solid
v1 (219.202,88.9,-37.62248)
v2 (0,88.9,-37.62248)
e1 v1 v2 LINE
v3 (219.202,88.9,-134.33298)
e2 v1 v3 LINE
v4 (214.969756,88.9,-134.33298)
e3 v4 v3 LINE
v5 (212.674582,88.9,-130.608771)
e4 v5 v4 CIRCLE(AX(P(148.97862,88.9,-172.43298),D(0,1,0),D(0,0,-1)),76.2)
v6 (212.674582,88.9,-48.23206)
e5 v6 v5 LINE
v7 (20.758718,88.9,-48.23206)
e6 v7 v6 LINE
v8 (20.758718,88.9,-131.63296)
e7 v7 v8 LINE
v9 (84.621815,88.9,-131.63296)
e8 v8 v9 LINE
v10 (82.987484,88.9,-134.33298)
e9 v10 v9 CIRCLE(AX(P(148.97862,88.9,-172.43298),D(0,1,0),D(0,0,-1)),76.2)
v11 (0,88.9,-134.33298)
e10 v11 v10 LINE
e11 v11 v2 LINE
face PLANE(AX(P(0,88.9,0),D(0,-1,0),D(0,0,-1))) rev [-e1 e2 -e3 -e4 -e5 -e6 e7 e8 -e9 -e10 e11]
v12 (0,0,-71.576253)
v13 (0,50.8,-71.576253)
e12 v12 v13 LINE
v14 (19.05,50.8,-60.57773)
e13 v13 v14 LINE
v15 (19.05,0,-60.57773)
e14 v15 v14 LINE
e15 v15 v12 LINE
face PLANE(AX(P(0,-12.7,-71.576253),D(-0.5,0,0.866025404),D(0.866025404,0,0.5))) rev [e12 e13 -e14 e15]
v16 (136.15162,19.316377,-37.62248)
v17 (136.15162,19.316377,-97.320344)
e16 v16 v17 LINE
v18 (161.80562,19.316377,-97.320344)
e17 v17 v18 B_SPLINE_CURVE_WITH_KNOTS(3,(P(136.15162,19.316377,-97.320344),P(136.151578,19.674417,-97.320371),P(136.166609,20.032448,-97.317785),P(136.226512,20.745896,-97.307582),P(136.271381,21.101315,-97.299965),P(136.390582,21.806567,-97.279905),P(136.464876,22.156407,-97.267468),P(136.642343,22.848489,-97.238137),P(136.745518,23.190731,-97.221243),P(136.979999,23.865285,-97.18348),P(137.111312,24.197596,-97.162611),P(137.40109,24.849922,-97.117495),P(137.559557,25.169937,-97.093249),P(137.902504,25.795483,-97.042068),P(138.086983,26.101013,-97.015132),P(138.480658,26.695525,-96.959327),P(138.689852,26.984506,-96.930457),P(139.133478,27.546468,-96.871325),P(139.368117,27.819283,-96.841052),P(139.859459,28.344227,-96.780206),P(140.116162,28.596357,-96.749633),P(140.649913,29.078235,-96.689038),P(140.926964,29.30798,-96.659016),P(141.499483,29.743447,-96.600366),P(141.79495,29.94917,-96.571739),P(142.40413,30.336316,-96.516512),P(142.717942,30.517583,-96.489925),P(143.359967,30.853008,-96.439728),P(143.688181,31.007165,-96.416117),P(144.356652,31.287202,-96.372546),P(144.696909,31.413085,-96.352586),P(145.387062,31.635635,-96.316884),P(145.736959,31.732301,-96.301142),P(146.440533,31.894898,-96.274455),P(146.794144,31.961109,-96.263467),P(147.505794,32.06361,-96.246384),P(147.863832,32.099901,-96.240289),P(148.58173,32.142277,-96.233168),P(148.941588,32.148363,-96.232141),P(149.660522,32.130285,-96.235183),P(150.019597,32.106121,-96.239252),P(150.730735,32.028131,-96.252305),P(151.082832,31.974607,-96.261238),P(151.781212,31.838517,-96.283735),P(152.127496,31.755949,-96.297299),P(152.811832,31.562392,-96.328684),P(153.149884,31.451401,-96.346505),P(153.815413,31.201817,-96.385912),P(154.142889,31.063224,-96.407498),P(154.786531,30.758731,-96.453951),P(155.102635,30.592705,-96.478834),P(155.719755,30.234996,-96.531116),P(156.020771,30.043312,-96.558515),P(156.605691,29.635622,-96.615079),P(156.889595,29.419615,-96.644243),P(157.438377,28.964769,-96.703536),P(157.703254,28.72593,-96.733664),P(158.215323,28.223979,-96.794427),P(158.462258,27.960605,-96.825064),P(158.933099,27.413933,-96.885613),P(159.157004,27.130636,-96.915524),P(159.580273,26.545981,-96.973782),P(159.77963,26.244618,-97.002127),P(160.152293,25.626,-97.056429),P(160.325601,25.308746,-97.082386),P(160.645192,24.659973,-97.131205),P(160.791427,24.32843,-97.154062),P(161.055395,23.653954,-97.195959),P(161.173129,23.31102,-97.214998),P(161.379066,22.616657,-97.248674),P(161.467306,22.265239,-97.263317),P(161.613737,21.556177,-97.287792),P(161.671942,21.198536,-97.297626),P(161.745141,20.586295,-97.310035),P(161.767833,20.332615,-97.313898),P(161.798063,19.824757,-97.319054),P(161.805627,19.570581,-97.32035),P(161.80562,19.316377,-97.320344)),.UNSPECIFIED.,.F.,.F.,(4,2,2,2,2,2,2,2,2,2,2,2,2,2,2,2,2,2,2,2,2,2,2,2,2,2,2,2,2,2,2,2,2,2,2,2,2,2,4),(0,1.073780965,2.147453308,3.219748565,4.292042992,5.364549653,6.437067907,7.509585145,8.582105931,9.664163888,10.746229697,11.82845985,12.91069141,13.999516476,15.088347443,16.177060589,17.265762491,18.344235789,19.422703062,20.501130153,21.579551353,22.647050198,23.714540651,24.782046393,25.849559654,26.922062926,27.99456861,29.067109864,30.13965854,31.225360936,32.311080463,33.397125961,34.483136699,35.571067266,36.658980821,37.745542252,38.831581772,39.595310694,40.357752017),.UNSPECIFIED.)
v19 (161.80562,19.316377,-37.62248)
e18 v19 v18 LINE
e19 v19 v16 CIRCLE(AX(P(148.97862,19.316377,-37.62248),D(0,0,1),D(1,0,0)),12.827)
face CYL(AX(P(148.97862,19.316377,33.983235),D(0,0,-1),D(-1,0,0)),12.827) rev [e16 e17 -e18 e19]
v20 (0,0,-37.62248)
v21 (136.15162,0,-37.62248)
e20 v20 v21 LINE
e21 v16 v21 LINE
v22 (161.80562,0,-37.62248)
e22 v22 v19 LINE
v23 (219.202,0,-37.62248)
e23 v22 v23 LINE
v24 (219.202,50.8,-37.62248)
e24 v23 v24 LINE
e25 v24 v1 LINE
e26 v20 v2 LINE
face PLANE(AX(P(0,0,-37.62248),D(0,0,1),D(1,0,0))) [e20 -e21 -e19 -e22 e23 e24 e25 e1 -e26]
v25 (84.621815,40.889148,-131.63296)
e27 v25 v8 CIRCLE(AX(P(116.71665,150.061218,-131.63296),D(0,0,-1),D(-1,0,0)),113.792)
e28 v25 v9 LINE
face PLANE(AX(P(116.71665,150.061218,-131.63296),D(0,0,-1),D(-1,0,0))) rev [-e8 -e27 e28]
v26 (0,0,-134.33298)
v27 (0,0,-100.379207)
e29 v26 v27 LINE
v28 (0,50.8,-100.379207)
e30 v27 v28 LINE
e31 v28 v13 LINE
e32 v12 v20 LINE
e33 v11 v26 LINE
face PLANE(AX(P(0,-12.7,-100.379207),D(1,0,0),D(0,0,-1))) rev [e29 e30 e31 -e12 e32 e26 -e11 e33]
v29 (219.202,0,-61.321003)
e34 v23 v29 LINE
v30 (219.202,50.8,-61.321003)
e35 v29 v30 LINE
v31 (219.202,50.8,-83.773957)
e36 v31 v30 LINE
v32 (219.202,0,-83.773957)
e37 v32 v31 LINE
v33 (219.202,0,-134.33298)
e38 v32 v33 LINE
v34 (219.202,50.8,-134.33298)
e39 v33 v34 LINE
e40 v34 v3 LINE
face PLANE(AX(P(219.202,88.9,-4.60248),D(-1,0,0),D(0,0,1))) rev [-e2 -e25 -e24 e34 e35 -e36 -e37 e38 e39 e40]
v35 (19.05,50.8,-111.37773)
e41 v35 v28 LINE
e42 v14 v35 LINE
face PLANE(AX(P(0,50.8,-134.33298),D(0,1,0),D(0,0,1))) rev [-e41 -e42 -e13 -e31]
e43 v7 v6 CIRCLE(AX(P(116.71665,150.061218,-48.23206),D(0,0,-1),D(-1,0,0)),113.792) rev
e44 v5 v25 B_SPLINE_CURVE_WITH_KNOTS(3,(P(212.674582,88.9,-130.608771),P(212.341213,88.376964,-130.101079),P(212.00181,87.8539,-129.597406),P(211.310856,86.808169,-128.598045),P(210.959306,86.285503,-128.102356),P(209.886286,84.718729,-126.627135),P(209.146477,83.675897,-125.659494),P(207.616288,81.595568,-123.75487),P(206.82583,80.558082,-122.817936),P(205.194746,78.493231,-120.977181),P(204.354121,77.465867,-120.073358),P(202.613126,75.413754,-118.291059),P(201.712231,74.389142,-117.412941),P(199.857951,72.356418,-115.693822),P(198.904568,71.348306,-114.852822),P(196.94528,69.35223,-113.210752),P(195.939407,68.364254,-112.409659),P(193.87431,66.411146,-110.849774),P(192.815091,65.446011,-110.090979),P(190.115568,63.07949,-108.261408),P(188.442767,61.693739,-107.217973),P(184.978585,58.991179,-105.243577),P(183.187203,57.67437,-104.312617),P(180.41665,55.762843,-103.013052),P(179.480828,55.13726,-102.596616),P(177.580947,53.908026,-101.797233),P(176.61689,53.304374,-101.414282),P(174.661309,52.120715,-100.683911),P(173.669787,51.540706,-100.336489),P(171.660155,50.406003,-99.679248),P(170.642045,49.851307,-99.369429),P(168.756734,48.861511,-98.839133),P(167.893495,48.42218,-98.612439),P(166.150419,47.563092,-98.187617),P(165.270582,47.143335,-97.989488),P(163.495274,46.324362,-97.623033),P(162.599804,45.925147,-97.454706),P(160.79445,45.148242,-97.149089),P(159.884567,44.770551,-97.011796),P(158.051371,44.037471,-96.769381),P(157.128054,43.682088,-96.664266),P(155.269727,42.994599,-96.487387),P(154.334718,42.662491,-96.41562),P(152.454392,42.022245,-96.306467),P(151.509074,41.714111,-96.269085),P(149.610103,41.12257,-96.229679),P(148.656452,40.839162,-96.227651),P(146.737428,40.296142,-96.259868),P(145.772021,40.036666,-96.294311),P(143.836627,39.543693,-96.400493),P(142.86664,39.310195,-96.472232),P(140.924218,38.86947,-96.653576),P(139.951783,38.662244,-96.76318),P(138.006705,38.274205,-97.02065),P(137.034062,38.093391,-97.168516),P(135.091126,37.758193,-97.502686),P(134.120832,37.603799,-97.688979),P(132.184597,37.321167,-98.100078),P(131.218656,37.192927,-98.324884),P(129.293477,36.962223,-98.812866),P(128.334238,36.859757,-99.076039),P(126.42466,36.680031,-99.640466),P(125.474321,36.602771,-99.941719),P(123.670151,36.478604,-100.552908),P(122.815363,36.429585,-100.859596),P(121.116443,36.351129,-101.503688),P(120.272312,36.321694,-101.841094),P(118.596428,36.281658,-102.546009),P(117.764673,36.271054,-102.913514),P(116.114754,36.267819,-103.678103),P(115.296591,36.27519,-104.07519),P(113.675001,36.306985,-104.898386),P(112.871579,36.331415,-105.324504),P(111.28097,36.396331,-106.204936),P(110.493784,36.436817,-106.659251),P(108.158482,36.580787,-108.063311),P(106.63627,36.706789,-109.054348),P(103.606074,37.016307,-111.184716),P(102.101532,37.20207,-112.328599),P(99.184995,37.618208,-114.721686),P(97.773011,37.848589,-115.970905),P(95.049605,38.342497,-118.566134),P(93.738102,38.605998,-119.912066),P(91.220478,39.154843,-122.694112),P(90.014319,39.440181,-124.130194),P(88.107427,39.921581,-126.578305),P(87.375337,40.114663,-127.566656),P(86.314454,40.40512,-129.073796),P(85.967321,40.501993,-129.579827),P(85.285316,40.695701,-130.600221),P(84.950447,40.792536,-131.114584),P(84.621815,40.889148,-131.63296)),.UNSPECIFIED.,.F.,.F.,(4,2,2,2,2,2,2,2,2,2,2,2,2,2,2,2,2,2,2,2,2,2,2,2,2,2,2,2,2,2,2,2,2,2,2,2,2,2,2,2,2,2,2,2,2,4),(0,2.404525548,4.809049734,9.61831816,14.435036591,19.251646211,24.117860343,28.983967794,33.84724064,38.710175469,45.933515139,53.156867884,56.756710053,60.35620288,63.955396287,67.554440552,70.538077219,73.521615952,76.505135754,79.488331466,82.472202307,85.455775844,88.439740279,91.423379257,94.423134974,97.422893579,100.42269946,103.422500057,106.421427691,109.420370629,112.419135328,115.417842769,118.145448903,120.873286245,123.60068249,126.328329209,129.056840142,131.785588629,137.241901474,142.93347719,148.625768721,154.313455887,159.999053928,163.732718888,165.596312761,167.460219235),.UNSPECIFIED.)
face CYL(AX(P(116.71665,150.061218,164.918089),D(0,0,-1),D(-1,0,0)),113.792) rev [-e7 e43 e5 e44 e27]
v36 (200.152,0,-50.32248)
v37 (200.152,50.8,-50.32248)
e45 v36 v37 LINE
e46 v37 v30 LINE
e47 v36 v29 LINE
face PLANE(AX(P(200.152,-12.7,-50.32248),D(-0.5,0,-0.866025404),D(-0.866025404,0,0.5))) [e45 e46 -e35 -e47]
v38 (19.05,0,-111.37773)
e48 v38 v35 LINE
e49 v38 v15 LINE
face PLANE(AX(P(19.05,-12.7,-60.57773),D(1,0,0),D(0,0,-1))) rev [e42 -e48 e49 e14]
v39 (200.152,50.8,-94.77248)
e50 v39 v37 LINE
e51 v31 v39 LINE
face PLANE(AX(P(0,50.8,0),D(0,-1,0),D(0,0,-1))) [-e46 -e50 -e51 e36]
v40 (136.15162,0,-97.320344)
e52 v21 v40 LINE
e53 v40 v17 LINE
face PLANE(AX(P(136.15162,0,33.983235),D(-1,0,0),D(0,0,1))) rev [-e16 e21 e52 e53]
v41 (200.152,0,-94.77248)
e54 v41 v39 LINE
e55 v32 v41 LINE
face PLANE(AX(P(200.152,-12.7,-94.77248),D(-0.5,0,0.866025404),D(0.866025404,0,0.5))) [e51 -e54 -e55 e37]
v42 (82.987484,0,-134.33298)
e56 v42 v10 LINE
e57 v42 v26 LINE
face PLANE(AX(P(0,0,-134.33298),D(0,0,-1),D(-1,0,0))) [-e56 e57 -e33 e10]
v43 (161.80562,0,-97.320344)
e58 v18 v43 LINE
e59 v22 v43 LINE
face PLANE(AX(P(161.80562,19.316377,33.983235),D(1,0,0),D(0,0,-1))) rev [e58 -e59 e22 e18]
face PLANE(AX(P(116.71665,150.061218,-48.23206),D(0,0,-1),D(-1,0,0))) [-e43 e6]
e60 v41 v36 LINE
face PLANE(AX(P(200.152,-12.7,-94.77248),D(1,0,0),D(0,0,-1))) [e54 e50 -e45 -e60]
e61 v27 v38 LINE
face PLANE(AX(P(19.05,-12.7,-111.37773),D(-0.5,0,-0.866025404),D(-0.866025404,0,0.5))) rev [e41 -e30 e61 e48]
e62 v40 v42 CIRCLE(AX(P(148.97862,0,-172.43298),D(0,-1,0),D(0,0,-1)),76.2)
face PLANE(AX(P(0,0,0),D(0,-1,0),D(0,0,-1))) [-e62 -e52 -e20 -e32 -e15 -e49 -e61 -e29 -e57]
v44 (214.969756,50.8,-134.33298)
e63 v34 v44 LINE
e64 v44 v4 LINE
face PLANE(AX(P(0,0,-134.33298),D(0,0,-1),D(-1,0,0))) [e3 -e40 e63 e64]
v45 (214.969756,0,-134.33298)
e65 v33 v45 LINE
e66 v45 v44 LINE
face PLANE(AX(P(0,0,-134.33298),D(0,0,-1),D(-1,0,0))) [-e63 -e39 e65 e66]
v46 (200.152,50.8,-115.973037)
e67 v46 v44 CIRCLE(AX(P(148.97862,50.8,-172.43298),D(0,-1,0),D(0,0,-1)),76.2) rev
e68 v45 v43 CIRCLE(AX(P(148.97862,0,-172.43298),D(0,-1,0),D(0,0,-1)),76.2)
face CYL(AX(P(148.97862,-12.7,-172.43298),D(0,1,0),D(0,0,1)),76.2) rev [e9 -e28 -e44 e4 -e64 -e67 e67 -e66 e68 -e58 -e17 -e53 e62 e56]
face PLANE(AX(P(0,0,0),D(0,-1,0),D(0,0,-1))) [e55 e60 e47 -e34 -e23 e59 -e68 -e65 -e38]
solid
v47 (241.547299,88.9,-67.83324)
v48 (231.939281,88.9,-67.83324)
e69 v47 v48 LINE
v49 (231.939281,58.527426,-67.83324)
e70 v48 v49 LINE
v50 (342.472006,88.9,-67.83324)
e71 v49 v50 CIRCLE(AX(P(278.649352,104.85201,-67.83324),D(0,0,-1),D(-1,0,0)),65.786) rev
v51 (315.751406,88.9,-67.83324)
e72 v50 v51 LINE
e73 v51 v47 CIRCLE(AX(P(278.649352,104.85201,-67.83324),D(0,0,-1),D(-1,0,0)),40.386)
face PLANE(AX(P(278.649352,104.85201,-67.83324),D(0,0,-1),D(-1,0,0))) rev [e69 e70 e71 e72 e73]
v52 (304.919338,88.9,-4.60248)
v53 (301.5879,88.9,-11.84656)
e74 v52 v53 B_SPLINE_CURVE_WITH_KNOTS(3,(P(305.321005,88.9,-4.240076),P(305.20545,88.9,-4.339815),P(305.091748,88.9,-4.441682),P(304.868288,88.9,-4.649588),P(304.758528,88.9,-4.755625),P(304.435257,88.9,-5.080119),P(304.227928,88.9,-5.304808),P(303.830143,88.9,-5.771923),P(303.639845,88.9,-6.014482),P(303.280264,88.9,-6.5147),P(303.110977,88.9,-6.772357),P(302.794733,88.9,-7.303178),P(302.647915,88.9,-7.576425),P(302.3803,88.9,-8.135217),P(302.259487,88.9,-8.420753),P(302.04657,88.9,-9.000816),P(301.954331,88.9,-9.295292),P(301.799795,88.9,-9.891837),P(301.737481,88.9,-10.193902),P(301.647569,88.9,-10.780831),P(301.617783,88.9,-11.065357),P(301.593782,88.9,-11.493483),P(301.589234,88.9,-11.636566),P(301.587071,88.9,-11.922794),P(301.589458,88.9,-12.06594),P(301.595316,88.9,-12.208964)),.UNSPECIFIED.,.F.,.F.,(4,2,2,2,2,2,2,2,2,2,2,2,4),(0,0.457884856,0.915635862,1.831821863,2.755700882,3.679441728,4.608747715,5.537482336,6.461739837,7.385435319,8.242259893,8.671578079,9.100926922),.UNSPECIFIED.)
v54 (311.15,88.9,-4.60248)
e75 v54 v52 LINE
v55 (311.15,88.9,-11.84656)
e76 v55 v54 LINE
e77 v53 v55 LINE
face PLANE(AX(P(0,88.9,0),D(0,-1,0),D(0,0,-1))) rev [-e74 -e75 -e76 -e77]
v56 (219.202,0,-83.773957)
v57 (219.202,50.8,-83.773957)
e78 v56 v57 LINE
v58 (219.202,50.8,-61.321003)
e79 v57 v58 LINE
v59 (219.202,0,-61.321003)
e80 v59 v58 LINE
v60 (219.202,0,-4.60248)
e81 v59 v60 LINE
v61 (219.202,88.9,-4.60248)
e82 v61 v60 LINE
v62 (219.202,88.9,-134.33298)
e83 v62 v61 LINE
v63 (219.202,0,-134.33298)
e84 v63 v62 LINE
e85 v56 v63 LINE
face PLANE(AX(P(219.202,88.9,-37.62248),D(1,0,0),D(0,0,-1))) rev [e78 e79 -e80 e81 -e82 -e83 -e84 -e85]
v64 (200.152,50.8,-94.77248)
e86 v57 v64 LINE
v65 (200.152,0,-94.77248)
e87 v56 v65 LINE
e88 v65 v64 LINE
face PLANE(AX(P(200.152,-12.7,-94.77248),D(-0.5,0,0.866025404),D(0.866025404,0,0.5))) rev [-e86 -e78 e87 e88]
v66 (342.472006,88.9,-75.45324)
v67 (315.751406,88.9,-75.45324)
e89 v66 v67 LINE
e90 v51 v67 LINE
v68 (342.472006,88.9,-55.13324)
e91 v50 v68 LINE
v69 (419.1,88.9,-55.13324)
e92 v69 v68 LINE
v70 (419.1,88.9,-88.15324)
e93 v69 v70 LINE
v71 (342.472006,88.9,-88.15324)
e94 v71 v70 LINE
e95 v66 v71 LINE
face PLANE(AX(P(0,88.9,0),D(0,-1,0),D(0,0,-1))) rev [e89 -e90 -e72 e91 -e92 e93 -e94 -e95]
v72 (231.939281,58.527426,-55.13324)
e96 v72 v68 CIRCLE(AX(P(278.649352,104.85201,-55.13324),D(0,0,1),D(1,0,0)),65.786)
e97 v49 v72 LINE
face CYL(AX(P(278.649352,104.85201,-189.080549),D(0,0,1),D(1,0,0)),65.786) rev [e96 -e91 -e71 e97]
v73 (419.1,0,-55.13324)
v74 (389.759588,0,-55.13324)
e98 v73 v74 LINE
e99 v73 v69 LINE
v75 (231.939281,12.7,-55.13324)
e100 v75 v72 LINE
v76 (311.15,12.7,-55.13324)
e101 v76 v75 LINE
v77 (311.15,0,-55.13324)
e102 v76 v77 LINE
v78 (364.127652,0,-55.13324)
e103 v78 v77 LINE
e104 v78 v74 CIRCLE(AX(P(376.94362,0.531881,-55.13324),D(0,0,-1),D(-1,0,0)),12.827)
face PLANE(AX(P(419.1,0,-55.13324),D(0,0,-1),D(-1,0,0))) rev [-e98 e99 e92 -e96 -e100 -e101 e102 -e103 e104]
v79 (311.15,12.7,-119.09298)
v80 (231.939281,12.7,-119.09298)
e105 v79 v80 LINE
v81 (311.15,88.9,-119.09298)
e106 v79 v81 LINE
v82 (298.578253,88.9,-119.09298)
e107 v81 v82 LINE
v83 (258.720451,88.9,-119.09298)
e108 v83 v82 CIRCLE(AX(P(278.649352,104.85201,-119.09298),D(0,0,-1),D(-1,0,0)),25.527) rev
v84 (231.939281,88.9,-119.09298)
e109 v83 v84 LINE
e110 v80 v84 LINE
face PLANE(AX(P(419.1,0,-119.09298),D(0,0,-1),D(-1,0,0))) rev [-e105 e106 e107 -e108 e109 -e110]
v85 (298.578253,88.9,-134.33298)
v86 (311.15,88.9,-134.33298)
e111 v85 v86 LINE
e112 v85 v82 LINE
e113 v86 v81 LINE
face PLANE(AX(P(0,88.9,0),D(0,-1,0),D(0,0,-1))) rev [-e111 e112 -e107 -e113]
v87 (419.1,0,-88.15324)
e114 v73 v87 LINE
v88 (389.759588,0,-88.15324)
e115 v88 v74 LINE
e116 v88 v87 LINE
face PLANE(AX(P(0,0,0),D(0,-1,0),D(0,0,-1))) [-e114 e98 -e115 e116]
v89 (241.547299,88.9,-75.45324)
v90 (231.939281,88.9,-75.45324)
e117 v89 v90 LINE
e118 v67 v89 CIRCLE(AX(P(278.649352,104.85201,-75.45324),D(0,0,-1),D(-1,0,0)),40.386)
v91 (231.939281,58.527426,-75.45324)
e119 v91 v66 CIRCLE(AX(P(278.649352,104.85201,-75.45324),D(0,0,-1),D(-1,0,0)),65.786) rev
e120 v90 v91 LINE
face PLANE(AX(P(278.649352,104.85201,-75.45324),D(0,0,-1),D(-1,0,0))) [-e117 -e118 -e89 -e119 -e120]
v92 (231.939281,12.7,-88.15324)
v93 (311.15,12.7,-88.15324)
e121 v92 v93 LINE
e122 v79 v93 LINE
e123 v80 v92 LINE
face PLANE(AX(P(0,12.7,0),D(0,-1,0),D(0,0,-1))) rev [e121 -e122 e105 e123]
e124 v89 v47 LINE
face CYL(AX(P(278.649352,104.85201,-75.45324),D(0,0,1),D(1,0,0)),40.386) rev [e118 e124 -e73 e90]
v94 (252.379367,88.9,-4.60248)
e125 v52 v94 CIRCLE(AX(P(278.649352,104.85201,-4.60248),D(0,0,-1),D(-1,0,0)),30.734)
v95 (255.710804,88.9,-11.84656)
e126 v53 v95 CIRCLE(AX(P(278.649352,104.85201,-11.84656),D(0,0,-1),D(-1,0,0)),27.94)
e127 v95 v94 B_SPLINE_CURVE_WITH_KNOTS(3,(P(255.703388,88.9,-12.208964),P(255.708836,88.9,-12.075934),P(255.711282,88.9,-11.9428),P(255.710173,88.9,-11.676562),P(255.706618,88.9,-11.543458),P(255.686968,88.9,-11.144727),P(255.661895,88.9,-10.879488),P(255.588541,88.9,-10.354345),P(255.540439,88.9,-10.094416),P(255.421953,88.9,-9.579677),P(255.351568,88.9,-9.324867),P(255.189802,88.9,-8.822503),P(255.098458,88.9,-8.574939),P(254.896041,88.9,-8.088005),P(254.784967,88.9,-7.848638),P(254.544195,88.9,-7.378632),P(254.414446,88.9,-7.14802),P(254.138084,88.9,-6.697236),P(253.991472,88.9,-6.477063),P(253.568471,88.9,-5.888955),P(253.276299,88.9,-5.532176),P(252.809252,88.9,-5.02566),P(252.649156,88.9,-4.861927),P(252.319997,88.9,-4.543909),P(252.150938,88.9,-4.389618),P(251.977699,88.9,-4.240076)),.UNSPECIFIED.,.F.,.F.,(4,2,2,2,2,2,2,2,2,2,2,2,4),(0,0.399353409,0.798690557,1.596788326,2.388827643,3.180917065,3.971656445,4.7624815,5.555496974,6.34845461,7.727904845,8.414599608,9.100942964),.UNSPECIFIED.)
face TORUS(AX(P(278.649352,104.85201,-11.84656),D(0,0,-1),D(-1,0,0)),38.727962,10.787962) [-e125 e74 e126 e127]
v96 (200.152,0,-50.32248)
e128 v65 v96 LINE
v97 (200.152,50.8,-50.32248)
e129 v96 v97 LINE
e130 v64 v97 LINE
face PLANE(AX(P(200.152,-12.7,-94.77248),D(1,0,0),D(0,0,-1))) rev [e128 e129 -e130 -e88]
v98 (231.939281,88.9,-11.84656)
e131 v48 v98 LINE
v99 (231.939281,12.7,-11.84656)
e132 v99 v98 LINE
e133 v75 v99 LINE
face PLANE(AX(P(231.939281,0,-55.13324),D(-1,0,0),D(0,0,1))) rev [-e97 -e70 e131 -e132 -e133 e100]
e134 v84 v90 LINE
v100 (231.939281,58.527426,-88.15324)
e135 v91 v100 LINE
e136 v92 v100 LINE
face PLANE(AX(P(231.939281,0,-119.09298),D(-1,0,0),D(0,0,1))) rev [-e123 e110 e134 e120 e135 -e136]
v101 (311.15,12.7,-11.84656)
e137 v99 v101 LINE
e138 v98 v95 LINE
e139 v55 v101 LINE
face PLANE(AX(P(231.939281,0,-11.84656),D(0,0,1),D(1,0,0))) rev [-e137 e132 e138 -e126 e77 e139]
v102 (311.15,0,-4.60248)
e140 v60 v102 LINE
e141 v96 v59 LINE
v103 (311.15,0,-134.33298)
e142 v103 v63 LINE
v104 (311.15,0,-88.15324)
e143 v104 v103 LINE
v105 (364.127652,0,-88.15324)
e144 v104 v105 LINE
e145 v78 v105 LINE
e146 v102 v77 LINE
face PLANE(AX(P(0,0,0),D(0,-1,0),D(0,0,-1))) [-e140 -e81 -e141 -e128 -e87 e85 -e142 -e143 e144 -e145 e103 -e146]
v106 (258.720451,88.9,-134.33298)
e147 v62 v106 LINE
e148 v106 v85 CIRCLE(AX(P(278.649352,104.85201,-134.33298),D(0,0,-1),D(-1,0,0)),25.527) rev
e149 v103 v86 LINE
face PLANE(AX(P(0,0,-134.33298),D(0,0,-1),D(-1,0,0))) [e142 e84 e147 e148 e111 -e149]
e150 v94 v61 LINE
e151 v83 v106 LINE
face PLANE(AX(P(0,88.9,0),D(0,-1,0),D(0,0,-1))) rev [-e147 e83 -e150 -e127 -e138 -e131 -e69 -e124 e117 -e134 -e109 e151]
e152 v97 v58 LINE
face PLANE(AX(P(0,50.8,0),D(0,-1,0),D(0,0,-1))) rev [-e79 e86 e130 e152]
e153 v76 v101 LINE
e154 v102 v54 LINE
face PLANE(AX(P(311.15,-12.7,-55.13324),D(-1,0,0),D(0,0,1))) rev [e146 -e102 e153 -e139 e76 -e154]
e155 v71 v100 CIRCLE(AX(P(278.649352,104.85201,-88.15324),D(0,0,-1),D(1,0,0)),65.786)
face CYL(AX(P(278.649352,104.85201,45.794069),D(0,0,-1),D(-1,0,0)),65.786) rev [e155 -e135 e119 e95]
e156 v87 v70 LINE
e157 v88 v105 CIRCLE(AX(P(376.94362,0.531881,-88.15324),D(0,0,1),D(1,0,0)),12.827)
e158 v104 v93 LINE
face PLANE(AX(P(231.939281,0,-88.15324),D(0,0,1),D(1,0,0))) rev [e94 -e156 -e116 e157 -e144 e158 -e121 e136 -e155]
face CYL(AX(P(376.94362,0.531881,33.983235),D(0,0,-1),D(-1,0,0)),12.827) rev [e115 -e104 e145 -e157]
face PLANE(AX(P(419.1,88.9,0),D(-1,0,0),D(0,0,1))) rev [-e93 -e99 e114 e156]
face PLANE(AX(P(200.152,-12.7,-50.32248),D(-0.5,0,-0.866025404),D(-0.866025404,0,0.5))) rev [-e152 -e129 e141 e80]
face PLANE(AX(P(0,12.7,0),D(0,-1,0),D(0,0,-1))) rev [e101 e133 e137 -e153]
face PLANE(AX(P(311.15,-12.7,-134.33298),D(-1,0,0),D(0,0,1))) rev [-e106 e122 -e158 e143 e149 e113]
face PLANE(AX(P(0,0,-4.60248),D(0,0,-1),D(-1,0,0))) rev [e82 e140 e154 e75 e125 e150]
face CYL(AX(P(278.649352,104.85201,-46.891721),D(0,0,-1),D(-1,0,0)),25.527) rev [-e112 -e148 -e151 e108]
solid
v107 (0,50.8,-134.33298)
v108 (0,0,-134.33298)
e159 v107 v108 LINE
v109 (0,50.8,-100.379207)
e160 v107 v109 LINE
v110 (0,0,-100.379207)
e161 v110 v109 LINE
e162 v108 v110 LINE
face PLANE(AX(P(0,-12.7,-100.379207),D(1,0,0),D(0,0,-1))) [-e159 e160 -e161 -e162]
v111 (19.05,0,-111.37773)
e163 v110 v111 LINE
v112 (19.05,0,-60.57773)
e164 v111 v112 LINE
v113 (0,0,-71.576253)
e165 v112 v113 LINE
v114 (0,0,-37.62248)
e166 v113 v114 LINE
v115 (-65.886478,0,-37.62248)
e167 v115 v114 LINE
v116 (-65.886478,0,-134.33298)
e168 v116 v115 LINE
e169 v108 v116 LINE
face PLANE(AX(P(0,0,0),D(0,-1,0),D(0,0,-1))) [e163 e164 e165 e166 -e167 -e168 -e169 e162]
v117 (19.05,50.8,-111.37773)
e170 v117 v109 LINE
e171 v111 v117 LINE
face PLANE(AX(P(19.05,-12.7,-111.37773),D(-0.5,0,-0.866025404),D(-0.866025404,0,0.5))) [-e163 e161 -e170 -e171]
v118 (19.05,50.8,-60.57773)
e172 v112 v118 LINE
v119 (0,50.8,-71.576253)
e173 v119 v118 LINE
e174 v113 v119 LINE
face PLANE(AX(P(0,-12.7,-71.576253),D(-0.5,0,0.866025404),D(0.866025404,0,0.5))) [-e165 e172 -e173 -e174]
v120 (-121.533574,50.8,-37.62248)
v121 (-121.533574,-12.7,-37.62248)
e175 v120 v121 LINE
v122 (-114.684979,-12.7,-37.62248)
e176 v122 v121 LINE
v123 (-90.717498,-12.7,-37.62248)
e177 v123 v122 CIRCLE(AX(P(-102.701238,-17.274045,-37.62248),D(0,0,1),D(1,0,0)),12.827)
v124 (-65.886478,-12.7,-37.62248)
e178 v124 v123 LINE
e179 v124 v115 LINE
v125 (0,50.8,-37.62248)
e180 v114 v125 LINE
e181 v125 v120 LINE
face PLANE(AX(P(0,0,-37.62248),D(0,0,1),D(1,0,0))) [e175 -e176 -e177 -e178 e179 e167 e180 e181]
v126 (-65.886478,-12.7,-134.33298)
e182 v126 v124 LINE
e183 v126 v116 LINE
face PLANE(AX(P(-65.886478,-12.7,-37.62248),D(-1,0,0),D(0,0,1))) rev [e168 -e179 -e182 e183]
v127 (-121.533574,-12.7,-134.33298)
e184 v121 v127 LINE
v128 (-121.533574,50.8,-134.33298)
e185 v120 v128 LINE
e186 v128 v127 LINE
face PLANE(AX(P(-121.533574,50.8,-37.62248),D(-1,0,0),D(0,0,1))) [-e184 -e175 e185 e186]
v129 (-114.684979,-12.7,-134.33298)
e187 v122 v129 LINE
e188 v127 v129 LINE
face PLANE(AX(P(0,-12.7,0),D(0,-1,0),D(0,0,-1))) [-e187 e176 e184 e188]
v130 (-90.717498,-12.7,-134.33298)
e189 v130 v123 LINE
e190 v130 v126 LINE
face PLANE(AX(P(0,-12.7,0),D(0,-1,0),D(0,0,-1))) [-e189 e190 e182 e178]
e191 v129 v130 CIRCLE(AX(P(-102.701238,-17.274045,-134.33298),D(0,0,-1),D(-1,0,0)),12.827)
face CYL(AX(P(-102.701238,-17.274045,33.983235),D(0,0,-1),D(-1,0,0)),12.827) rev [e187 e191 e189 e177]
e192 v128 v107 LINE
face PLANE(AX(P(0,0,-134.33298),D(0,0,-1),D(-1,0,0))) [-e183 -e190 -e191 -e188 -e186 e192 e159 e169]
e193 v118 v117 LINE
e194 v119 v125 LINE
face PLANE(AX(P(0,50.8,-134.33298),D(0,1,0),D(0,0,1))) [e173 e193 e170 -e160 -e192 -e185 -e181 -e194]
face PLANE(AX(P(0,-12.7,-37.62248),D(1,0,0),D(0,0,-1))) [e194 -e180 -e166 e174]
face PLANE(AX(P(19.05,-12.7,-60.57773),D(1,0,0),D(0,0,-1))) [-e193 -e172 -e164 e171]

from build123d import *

# Parameters (mm, degrees)
SKETCH1_W           = 419.1
SKETCH1_H           = 142.18412
BOSS_EXTRUDE1_DEPTH = 88.9
SKETCH2_R           = 119.38
CUT_EXTRUDE1_DEPTH  = 83.4009
SKETCH7_W           = 187.160719179
SKETCH7_H           = 30.93974
SKETCH7_H_2         = 43.28668
CUT_EXTRUDE2_DEPTH  = 452.402640644
SKETCH4_R           = 40.386
CUT_EXTRUDE4_DEPTH  = 7.62
CUT_EXTRUDE17_START = -12.7
CUT_EXTRUDE17_DEPTH = 12.7
CUT_EXTRUDE18_DEPTH = 12.7
SKETCH18_R          = 25.527
CUT_EXTRUDE11_DEPTH = 23.09114
SKETCH8_W           = 419.1
SKETCH8_H           = 88.9
CUT_EXTRUDE6_DEPTH  = 7.85114
SKETCH9_W           = 419.1
SKETCH9_H           = 88.9
CUT_EXTRUDE7_DEPTH  = 7.14248
SKETCH10_W          = 219.202
SKETCH10_H          = 88.9
CUT_EXTRUDE8_DEPTH  = 30.48
SKETCH12_W          = 121.533574186
SKETCH12_H          = 96.7105
BOSS_EXTRUDE2_DEPTH = 50.8
SKETCH14_W          = 55.647095764
SKETCH14_H          = 96.7105
BOSS_EXTRUDE3_DEPTH = 12.7
CUT_EXTRUDE10_REACH = 448.907
SKETCH17_R          = 12.827
SKETCH22_W          = 199.898
SKETCH22_H          = 88.9
BOSS_EXTRUDE5_DEPTH = 2.54
SKETCH29_R          = 12.827
CUT_EXTRUDE14_DEPTH = 447.906526346
BOSS_EXTRUDE6_DEPTH = 86.10092
SKETCH45_W          = 107.95
SKETCH45_H          = 50.53076
SKETCH45_H_2        = 15.24
CUT_EXTRUDE22_DEPTH = 452.677672269
SKETCH46_W          = 91.948
SKETCH46_H          = 129.7305
BOSS_EXTRUDE7_DEPTH = 12.7
CUT_EXTRUDE23_DEPTH = 452.677672176
SPLIT1_DEPTH        = 50.8
SPLIT1_START        = -4.447045482
SPLIT1_2_OUTLINE_W  = 55.647095764
SPLIT1_2_OUTLINE_H  = 96.7105
SPLIT1_2_DEPTH      = 4.447045482
SPLIT1_START_2      = -134.33298
SPLIT1_3_DEPTH      = 96.7105
SPLIT1_START_3      = -12.7
SPLIT1_4_DEPTH      = 63.5
SPLIT3_DEPTH        = 88.9
SPLIT3_START        = 50.8
SPLIT3_2_OUTLINE_W  = 25.654
SPLIT3_2_OUTLINE_H  = 10.60958
SPLIT3_2_DEPTH      = 38.1
SPLIT3_START_2      = 19.31637732
SPLIT3_3_DEPTH      = 31.48362268
SPLIT3_START_3      = -131.63296
SPLIT3_4_DEPTH      = 83.4009
SPLIT3_START_4      = -48.23206
SPLIT3_5_DEPTH      = 10.60958
SPLIT3_6_DEPTH      = 88.9
SPLIT3_7_DEPTH      = 38.1


with BuildPart() as part:
    # Sketch1 → Boss-Extrude1 (new body)
    with BuildSketch(Plane(origin=(0, 0, 0), x_dir=(1, 0, 0), z_dir=(0, 1, 0))):
        with Locations((209.55, 71.09206)):
            Rectangle(SKETCH1_W, SKETCH1_H)
    extrude(amount=BOSS_EXTRUDE1_DEPTH)

    # Sketch2 → Cut-Extrude1 (cut)
    with BuildSketch(Plane(origin=(0, 0, -131.63296), x_dir=(-1, 0, 0), z_dir=(0, 0, -1))):
        with Locations((-116.7166499, 150.061217688)):
            Circle(SKETCH2_R)
    extrude(amount=-CUT_EXTRUDE1_DEPTH, mode=Mode.SUBTRACT)

    # Sketch7 → Cut-Extrude2 (cut, through all)
    with BuildSketch(Plane(origin=(0, 88.9, 0), x_dir=(1, 0, 0), z_dir=(0, 1, 0))):
        with Locations((325.519640411, 103.62311)):
            Rectangle(SKETCH7_W, SKETCH7_H)
        with Locations((325.519640411, 33.4899)):
            Rectangle(SKETCH7_W, SKETCH7_H_2)
    extrude(amount=-CUT_EXTRUDE2_DEPTH, mode=Mode.SUBTRACT)

    # Sketch4 → Cut-Extrude4 (cut)
    with BuildSketch(Plane(origin=(0, 0, -67.83324), x_dir=(-1, 0, 0), z_dir=(0, 0, -1))):
        with Locations((-278.649352085, 104.852009966)):
            Circle(SKETCH4_R)
    extrude(amount=CUT_EXTRUDE4_DEPTH, mode=Mode.SUBTRACT)

    # Sketch39 → Cut-Extrude17 (cut)
    with BuildSketch(Plane.XY.offset(-55.13324).offset(CUT_EXTRUDE17_START)):
        with BuildLine():
            Line((231.939280821, 58.527426444), (231.939280821, 88.9))
            Line((231.939280821, 88.9), (342.472006166, 88.9))
            ThreePointArc((342.472006166, 88.9), (296.080170447, 41.417284719), (231.939280821, 58.527426444))
        make_face()
    extrude(amount=CUT_EXTRUDE17_DEPTH, mode=Mode.SUBTRACT)

    # Sketch40 → Cut-Extrude18 (cut)
    with BuildSketch(Plane(origin=(0, 0, -88.15324), x_dir=(-1, 0, 0), z_dir=(0, 0, -1))):
        with BuildLine():
            Line((-231.939280821, 88.9), (-231.939280821, 58.527426444))
            ThreePointArc((-231.939280821, 58.527426444), (-296.080170447, 41.417284719), (-342.472006166, 88.9))
            Line((-342.472006166, 88.9), (-231.939280821, 88.9))
        make_face()
    extrude(amount=-CUT_EXTRUDE18_DEPTH, mode=Mode.SUBTRACT)

    # Sketch18 → Cut-Extrude11 (cut)
    with BuildSketch(Plane(origin=(0, 0, -142.18412), x_dir=(-1, 0, 0), z_dir=(0, 0, -1))):
        with Locations((-278.649352085, 104.852009966)):
            Circle(SKETCH18_R)
    extrude(amount=-CUT_EXTRUDE11_DEPTH, mode=Mode.SUBTRACT)

    # Sketch8 → Cut-Extrude6 (cut)
    with BuildSketch(Plane(origin=(0, 0, -142.18412), x_dir=(-1, 0, 0), z_dir=(0, 0, -1))):
        with Locations((-209.55, 44.45)):
            Rectangle(SKETCH8_W, SKETCH8_H)
    extrude(amount=-CUT_EXTRUDE6_DEPTH, mode=Mode.SUBTRACT)

    # Sketch9 → Cut-Extrude7 (cut)
    with BuildSketch(Plane.XY):
        with Locations((209.55, 44.45)):
            Rectangle(SKETCH9_W, SKETCH9_H)
    extrude(amount=-CUT_EXTRUDE7_DEPTH, mode=Mode.SUBTRACT)

    # Sketch10 → Cut-Extrude8 (cut)
    with BuildSketch(Plane.XY.offset(-7.14248)):
        with Locations((109.601, 44.45)):
            Rectangle(SKETCH10_W, SKETCH10_H)
    extrude(amount=-CUT_EXTRUDE8_DEPTH, mode=Mode.SUBTRACT)

    # Sketch12 → Boss-Extrude2 (add)
    with BuildSketch(Plane.XZ):
        with Locations((-60.766787093, -85.97773)):
            Rectangle(SKETCH12_W, SKETCH12_H)
    extrude(amount=-BOSS_EXTRUDE2_DEPTH)

    # Sketch14 → Boss-Extrude3 (add)
    with BuildSketch(Plane.XZ):
        with Locations((-93.710026304, -85.97773)):
            Rectangle(SKETCH14_W, SKETCH14_H)
    extrude(amount=BOSS_EXTRUDE3_DEPTH)

    # Cut-Extrude10: up to this face of the body (flat: up to its plane)
    cut_extrude10_end = Plane(part.part.faces().sort_by_distance((319.151, 44.45, -7.14248))[0])
    # Sketch17 → Cut-Extrude10 (cut, up to the picked face)
    with BuildSketch(Plane(origin=(0, 0, -134.33298), x_dir=(-1, 0, 0), z_dir=(0, 0, -1)), mode=Mode.PRIVATE) as cut_extrude10_sk1:
        with Locations((-376.94362, 0.531880938)):
            Circle(SKETCH17_R)
    cut_extrude10_tool1 = split(extrude(cut_extrude10_sk1.sketch, amount=-CUT_EXTRUDE10_REACH, mode=Mode.PRIVATE), bisect_by=cut_extrude10_end, keep=Keep.BOTH, mode=Mode.PRIVATE)
    # Sketch17 → Cut-Extrude10 (cut, up to the picked face)
    with BuildSketch(Plane(origin=(0, 0, -134.33298), x_dir=(-1, 0, 0), z_dir=(0, 0, -1)), mode=Mode.PRIVATE) as cut_extrude10_sk2:
        with Locations((102.701238422, -17.274045482)):
            Circle(SKETCH17_R)
    cut_extrude10_tool2 = split(extrude(cut_extrude10_sk2.sketch, amount=-CUT_EXTRUDE10_REACH, mode=Mode.PRIVATE), bisect_by=cut_extrude10_end, keep=Keep.BOTH, mode=Mode.PRIVATE)
    # Sketch17 → Cut-Extrude10 (cut, up to the picked face)
    with BuildSketch(Plane(origin=(0, 0, -134.33298), x_dir=(-1, 0, 0), z_dir=(0, 0, -1)), mode=Mode.PRIVATE) as cut_extrude10_sk3:
        with BuildLine():
            Line((-161.80562, 19.31637742), (-161.80562, 0))
            Line((-161.80562, 0), (-136.15162, 0))
            Line((-136.15162, 0), (-136.15162, 19.31637742))
            ThreePointArc((-136.15162, 19.31637742), (-148.97862, 32.14337742), (-161.80562, 19.31637742))
        make_face()
    cut_extrude10_tool3 = split(extrude(cut_extrude10_sk3.sketch, amount=-CUT_EXTRUDE10_REACH, mode=Mode.PRIVATE), bisect_by=cut_extrude10_end, keep=Keep.BOTH, mode=Mode.PRIVATE)
    add(cut_extrude10_tool1.solids().sort_by(Axis((376.94362, 0.531881, -134.33298), (0, 0, 1)))[0], mode=Mode.SUBTRACT)
    add(cut_extrude10_tool2.solids().sort_by(Axis((-102.701238, -17.274045, -134.33298), (0, 0, 1)))[0], mode=Mode.SUBTRACT)
    add(cut_extrude10_tool3.solids().sort_by(Axis((148.97862, 14.834778, -134.33298), (0, 0, 1)))[0], mode=Mode.SUBTRACT)

    # Sketch22 → Boss-Extrude5 (add)
    with BuildSketch(Plane.XY.offset(-7.14248)):
        with Locations((319.151, 44.45)):
            Rectangle(SKETCH22_W, SKETCH22_H)
    extrude(amount=BOSS_EXTRUDE5_DEPTH)

    # Sketch29 → Cut-Extrude14 (cut, through all)
    with BuildSketch(Plane(origin=(0, 0, -7.14248), x_dir=(-1, 0, 0), z_dir=(0, 0, -1))):
        with Locations((-376.94362, 0.531880938)):
            Circle(SKETCH29_R)
    extrude(amount=-CUT_EXTRUDE14_DEPTH, mode=Mode.SUBTRACT)

    # Sketch30 → Boss-Extrude6 (add)
    with BuildSketch(Plane(origin=(0, 0, -134.33298), x_dir=(-1, 0, 0), z_dir=(0, 0, -1))):
        with BuildLine():
            Line((-14.194018979, 88.9), (-20.758717893, 88.9))
            ThreePointArc((-20.758717893, 88.9), (-116.7166499, 36.269217688), (-212.674581906, 88.9))
            Line((-212.674581906, 88.9), (-219.239280821, 88.9))
            ThreePointArc((-219.239280821, 88.9), (-116.7166499, 30.681217688), (-14.194018979, 88.9))
        make_face()
    extrude(amount=-BOSS_EXTRUDE6_DEPTH)

    # Sketch44 → Cut-Revolve1 (revolve, cut)
    with BuildSketch(Plane(origin=(0, 104.852009966, 0), x_dir=(1, 0, 0), z_dir=(0, 1, 0))):
        with BuildLine():
            Line((278.649352085, 11.84656), (306.589352085, 11.84656))
            ThreePointArc((306.589352085, 11.84656), (307.31205993, 7.964449393), (309.383352085, 4.60248))
            Line((309.383352085, 4.60248), (278.649352085, 4.60248))
            Line((278.649352085, 4.60248), (278.649352085, 11.84656))
        make_face()
    revolve(axis=Axis((278.649352085, 104.852009966, -328.456473898), (0, 0, 1)), mode=Mode.SUBTRACT)

    # Sketch45 → Cut-Extrude22 (cut, through all)
    with BuildSketch(Plane(origin=(0, 88.9, 0), x_dir=(1, 0, 0), z_dir=(0, 1, 0))):
        with Locations((365.125, 29.86786)):
            Rectangle(SKETCH45_W, SKETCH45_H)
        with Locations((365.125, 126.71298)):
            Rectangle(SKETCH45_W, SKETCH45_H_2)
    extrude(amount=-CUT_EXTRUDE22_DEPTH, mode=Mode.SUBTRACT)

    # Sketch46 → Boss-Extrude7 (add)
    with BuildSketch(Plane.XZ):
        with Locations((265.176, -69.46773)):
            Rectangle(SKETCH46_W, SKETCH46_H)
    extrude(amount=-BOSS_EXTRUDE7_DEPTH)

    # Sketch47 → Cut-Extrude23 (cut, through all)
    with BuildSketch(Plane(origin=(0, 88.9, 0), x_dir=(1, 0, 0), z_dir=(0, 1, 0))):
        with BuildLine():
            Line((214.969755768, 134.33298), (82.987484232, 134.33298))
            ThreePointArc((82.987484232, 134.33298), (148.97862, 96.23298), (214.969755768, 134.33298))
        make_face()
    extrude(amount=-CUT_EXTRUDE23_DEPTH, mode=Mode.SUBTRACT)

    # Split1 4 outline → Split1 4 (cut)
    with BuildSketch(Plane(origin=(0, 0, 0), x_dir=(1, 0, 0), z_dir=(0, 1, 0)).offset(SPLIT1_START_3)):
        Polygon((0, 37.62248), (0, 71.576252628), (19.05, 60.57773), (19.05, 111.37773), (0, 100.379207372), (0, 134.33298), (-121.533574186, 134.33298), (-121.533574186, 37.62248), align=None)
    extrude(amount=SPLIT1_4_DEPTH, mode=Mode.SUBTRACT)

    # Split3 6 outline → Split3 6 (cut)
    with BuildSketch(Plane(origin=(0, 0, 0), x_dir=(1, 0, 0), z_dir=(0, 1, 0))):
        with BuildLine():
            Line((219.202, 37.62248), (219.202, 61.321002628))
            Line((219.202, 61.321002628), (200.152, 50.32248))
            Line((200.152, 50.32248), (200.152, 94.77248))
            Line((200.152, 94.77248), (219.202, 83.773957372))
            Line((219.202, 83.773957372), (219.202, 134.33298))
            Line((219.202, 134.33298), (214.969755768, 134.33298))
            ThreePointArc((214.969755768, 134.33298), (150.556684051, 96.249322213), (84.621814859, 131.63296))
            ThreePointArc((84.621814859, 131.63296), (83.790669029, 132.974507549), (82.987484232, 134.33298))
            Line((82.987484232, 134.33298), (0, 134.33298))
            Line((0, 134.33298), (0, 37.62248))
            Line((0, 37.62248), (219.202, 37.62248))
        make_face()
    extrude(amount=SPLIT3_6_DEPTH, mode=Mode.SUBTRACT)

    # Split3 7 outline → Split3 7 (cut)
    with BuildSketch(Plane(origin=(0, 0, 0), x_dir=(1, 0, 0), z_dir=(0, 1, 0)).offset(SPLIT3_START)):
        Polygon((200.152, 50.32248), (219.202, 61.321002628), (219.202, 83.773957372), (200.152, 94.77248), align=None)
    extrude(amount=SPLIT3_7_DEPTH, mode=Mode.SUBTRACT)


with BuildPart() as body_2:
    # Split1: read off the stored shape, not the designer's step
    # Split1 outline → Split1 (new body)
    with BuildSketch(Plane(origin=(0, 0, 0), x_dir=(1, 0, 0), z_dir=(0, 1, 0))):
        Polygon((19.05, 111.37773), (0, 100.379207372), (0, 134.33298), (-121.533574186, 134.33298), (-121.533574186, 37.62248), (0, 37.62248), (0, 71.576252628), (19.05, 60.57773), align=None)
    extrude(amount=SPLIT1_DEPTH)

    # Split1 2 outline → Split1 2 (add)
    with BuildSketch(Plane(origin=(0, 0, 0), x_dir=(1, 0, 0), z_dir=(0, 1, 0)).offset(SPLIT1_START)):
        with Locations((-93.710026304, 85.97773)):
            Rectangle(SPLIT1_2_OUTLINE_W, SPLIT1_2_OUTLINE_H)
    extrude(amount=SPLIT1_2_DEPTH)

    # Split1 3 outline → Split1 3 (add)
    with BuildSketch(Plane.XY.offset(SPLIT1_START_2)):
        with BuildLine():
            Line((-121.533574186, -4.447045482), (-121.533574186, -12.7))
            Line((-121.533574186, -12.7), (-114.684978945, -12.7))
            ThreePointArc((-114.684978945, -12.7), (-109.976561356, -6.709879391), (-102.701238422, -4.447045482))
            Line((-102.701238422, -4.447045482), (-121.533574186, -4.447045482))
        make_face()
        with BuildLine():
            Line((-65.886478422, -4.447045482), (-102.701238422, -4.447045482))
            ThreePointArc((-102.701238422, -4.447045482), (-95.425915488, -6.709879391), (-90.717497899, -12.7))
            Line((-90.717497899, -12.7), (-65.886478422, -12.7))
            Line((-65.886478422, -12.7), (-65.886478422, -4.447045482))
        make_face()
    extrude(amount=SPLIT1_3_DEPTH)


with BuildPart() as body_3:
    # Split3: read off the stored shape, not the designer's step
    # Split3 outline → Split3 (new body)
    with BuildSketch(Plane(origin=(0, 0, 0), x_dir=(1, 0, 0), z_dir=(0, 1, 0))):
        with BuildLine():
            Line((219.202, 83.773957372), (219.202, 134.33298))
            Line((219.202, 134.33298), (214.969755768, 134.33298))
            ThreePointArc((214.969755768, 134.33298), (192.516631386, 109.89593846), (161.80562, 97.320344106))
            Line((161.80562, 97.320344106), (161.80562, 48.23206))
            Line((161.80562, 48.23206), (161.80562, 37.62248))
            Line((161.80562, 37.62248), (219.202, 37.62248))
            Line((219.202, 37.62248), (219.202, 61.321002628))
            Line((219.202, 61.321002628), (200.152, 50.32248))
            Line((200.152, 50.32248), (200.152, 94.77248))
            Line((200.152, 94.77248), (219.202, 83.773957372))
        make_face()
        with BuildLine():
            Line((136.15162, 48.23206), (136.15162, 97.320344106))
            ThreePointArc((136.15162, 97.320344106), (106.745056968, 109.007699917), (84.621814859, 131.63296))
            ThreePointArc((84.621814859, 131.63296), (83.790669029, 132.974507549), (82.987484232, 134.33298))
            Line((82.987484232, 134.33298), (0, 134.33298))
            Line((0, 134.33298), (0, 100.379207372))
            Line((0, 100.379207372), (19.05, 111.37773))
            Line((19.05, 111.37773), (19.05, 60.57773))
            Line((19.05, 60.57773), (0, 71.576252628))
            Line((0, 71.576252628), (0, 37.62248))
            Line((0, 37.62248), (136.15162, 37.62248))
            Line((136.15162, 37.62248), (136.15162, 48.23206))
        make_face()
    extrude(amount=SPLIT3_DEPTH)

    # Split3 2 outline → Split3 2 (add)
    with BuildSketch(Plane(origin=(0, 0, 0), x_dir=(1, 0, 0), z_dir=(0, 1, 0)).offset(SPLIT3_START)):
        Polygon((219.202, 61.321002628), (219.202, 83.773957372), (200.152, 94.77248), (200.152, 50.32248), align=None)
        with Locations((148.97862, 42.92727)):
            Rectangle(SPLIT3_2_OUTLINE_W, SPLIT3_2_OUTLINE_H)
        Polygon((0, 100.379207372), (0, 71.576252628), (19.05, 60.57773), (19.05, 111.37773), align=None)
    extrude(amount=SPLIT3_2_DEPTH)

    # Split3 3 outline → Split3 3 (add)
    with BuildSketch(Plane(origin=(0, 0, 0), x_dir=(1, 0, 0), z_dir=(0, 1, 0)).offset(SPLIT3_START_2)):
        with BuildLine():
            ThreePointArc((161.80562, 97.320344106), (148.97862, 96.23298), (136.15162, 97.320344106))
            Line((136.15162, 97.320344106), (136.15162, 37.62248))
            Line((136.15162, 37.62248), (161.80562, 37.62248))
            Line((161.80562, 37.62248), (161.80562, 97.320344106))
        make_face()
    extrude(amount=SPLIT3_3_DEPTH)

    # Split3 4 outline → Split3 4 (cut)
    with BuildSketch(Plane.XY.offset(SPLIT3_START_3)):
        with BuildLine():
            ThreePointArc((161.80562, 19.31637742), (148.97862, 32.14337742), (136.15162, 19.31637742))
            Line((136.15162, 19.31637742), (161.80562, 19.31637742))
        make_face()
        with BuildLine():
            ThreePointArc((20.758717893, 88.9), (116.716649899, 36.269217688), (212.674581906, 88.9))
            Line((212.674581906, 88.9), (161.80562, 88.9))
            Line((161.80562, 88.9), (161.80562, 50.8))
            Line((161.80562, 50.8), (136.15162, 50.8))
            Line((136.15162, 50.8), (136.15162, 88.9))
            Line((136.15162, 88.9), (20.758717893, 88.9))
        make_face()
    extrude(amount=SPLIT3_4_DEPTH, mode=Mode.SUBTRACT)

    # Split3 5 outline → Split3 5 (cut)
    with BuildSketch(Plane.XY.offset(SPLIT3_START_4)):
        with BuildLine():
            ThreePointArc((161.80562, 19.31637742), (148.97862, 32.14337742), (136.15162, 19.31637742))
            Line((136.15162, 19.31637742), (161.80562, 19.31637742))
        make_face()
    extrude(amount=SPLIT3_5_DEPTH, mode=Mode.SUBTRACT)


solid = Compound([part.part, body_2.part, body_3.part])
